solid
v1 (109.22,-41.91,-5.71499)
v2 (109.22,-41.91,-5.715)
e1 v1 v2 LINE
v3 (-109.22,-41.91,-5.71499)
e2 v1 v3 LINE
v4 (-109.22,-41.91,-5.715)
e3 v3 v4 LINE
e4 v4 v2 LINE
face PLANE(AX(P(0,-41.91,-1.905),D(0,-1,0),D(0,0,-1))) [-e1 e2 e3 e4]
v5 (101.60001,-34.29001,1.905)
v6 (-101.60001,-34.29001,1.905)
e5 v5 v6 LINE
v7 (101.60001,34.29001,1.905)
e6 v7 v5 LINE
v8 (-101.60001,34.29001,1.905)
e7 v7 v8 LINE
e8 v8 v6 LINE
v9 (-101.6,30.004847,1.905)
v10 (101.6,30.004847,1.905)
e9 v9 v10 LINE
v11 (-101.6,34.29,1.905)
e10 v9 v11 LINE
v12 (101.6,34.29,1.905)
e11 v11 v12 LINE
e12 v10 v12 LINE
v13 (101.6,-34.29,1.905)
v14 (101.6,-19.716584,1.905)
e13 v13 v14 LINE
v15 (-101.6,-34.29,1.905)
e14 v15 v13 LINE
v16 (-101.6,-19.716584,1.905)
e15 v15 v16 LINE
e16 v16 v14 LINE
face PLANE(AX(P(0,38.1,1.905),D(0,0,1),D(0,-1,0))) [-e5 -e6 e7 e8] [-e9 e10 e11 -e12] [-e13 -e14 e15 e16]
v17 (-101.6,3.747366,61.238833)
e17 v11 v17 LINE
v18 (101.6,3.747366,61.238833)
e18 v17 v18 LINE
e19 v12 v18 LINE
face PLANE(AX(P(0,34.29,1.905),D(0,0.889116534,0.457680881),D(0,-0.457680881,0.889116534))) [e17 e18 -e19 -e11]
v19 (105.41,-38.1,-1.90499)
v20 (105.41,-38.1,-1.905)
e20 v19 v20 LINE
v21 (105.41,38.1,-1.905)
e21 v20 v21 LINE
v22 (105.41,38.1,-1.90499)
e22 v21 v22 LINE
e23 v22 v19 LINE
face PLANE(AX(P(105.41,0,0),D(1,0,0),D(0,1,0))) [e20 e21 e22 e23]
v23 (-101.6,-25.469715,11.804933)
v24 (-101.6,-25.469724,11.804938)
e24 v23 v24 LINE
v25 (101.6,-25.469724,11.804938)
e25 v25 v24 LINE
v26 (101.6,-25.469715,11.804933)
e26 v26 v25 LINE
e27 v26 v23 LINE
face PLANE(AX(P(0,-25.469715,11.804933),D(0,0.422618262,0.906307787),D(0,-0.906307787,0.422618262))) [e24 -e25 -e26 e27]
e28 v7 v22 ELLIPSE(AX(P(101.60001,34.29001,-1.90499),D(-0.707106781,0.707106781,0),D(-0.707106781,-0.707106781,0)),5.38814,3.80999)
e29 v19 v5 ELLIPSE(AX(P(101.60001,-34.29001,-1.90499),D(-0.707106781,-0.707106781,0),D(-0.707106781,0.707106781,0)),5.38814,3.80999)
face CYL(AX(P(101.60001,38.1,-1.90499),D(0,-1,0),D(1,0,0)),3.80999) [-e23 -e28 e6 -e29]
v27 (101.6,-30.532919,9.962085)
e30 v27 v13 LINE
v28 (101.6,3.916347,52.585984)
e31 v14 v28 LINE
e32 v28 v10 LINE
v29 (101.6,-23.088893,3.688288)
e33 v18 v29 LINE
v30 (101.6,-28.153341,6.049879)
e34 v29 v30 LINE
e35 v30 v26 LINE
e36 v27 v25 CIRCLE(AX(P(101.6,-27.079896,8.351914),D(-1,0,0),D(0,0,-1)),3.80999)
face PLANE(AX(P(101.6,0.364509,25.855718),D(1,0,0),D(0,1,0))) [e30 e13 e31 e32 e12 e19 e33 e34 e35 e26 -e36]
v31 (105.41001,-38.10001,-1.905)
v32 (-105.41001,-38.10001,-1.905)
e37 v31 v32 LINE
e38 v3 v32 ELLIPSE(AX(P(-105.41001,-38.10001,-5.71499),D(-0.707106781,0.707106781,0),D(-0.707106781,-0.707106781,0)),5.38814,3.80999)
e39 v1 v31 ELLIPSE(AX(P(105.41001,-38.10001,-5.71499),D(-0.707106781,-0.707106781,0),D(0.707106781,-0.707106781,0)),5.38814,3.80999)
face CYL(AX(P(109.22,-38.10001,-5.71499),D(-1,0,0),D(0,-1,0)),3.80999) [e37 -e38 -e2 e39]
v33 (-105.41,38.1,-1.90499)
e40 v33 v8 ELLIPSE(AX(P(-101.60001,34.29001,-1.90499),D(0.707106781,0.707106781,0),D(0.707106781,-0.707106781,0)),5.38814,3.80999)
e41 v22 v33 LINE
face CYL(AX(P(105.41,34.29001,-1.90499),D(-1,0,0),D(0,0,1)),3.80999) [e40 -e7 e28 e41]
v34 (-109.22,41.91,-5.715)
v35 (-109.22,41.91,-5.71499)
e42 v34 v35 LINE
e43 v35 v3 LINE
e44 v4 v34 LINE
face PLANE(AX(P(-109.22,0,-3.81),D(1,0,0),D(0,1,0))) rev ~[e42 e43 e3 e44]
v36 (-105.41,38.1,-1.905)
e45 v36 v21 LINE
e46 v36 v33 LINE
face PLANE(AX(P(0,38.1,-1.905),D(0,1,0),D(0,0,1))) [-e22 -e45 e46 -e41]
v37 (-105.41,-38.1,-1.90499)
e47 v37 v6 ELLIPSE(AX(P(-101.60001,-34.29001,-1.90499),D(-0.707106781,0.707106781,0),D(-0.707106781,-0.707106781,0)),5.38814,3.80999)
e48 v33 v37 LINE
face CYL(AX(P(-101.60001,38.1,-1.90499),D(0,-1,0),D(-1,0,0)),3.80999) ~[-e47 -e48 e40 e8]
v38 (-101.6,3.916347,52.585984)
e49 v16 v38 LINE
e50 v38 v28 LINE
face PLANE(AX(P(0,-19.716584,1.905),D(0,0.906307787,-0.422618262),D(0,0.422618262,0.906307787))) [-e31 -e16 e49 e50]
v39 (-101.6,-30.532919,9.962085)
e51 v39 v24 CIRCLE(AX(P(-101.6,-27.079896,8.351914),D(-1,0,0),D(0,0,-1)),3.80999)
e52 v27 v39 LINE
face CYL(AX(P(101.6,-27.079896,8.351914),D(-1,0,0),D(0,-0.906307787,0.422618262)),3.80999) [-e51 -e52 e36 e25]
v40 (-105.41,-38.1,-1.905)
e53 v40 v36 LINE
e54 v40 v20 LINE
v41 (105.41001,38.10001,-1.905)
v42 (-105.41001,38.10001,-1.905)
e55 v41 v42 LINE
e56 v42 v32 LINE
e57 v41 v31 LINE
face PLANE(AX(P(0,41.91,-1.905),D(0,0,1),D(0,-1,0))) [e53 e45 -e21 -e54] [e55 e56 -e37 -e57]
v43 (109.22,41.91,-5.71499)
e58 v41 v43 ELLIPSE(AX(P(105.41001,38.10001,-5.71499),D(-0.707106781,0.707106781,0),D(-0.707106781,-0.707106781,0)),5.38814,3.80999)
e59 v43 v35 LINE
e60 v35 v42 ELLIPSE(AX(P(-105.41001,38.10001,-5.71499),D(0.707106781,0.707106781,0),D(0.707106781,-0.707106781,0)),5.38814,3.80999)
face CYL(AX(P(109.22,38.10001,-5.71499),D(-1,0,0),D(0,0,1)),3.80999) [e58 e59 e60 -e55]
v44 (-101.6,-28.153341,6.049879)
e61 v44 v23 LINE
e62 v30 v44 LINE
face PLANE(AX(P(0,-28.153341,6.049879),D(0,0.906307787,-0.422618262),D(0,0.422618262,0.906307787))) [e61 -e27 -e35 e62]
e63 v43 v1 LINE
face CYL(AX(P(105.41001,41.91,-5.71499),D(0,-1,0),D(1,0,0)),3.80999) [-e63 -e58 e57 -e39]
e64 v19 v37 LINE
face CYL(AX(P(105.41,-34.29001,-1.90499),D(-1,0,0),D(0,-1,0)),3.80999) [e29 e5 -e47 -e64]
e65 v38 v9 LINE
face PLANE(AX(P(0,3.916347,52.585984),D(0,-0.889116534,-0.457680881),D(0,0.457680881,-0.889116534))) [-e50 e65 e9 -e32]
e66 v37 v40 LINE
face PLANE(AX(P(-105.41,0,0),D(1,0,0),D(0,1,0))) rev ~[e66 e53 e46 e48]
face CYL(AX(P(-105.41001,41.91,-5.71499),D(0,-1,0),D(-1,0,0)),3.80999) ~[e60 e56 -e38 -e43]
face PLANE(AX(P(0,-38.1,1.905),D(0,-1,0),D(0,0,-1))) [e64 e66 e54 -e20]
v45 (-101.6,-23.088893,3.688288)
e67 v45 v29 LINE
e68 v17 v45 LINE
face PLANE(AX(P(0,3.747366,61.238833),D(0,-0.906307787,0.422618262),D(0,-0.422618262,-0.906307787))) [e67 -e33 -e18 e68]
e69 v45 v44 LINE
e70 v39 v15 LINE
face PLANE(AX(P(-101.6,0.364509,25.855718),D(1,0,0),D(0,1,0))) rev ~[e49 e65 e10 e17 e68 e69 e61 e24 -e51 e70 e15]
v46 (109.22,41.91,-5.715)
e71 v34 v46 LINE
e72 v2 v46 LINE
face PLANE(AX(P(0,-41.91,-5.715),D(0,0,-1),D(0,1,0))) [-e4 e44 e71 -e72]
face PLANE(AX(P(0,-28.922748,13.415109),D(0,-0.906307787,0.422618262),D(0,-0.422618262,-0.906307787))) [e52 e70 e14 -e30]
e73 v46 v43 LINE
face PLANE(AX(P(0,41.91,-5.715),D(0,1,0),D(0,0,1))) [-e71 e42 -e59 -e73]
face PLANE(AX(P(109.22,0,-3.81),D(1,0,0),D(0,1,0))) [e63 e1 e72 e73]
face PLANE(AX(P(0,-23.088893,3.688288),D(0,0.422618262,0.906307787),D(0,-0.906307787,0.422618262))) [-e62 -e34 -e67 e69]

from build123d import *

# Parameters (mm, degrees)
F1_DEPTH = 101.6
F2_DEPTH = 105.41
F3_R     = 3.80999
F4_R     = 3.80999
F5_DEPTH = 109.22
F6_R     = 3.80999


# Not quite as in the source:
# - a fillet or chamfer is up to 0.001 mm smaller than in the source, because OpenCascade refuses the exact size


with BuildPart() as f1:
    # F0 (on Right) → F1 (new body, symmetric)
    with BuildSketch(Plane.YZ):
        Polygon((-28.9227480759, 13.4151088954), (-34.29, 1.905), (-19.7165844463, 1.905), (3.9163465702, 52.5859841168), (30.004847431, 1.905), (34.29, 1.905), (3.7473661652, 61.2388325007), (-23.0888934554, 3.6882880238), (-28.1533413693, 6.0498788705), (-25.4697154073, 11.8049333181), align=None)
    extrude(amount=F1_DEPTH, both=True)

    # F0 (on Right) → F2 (join, symmetric)
    with BuildSketch(Plane.YZ):
        Polygon((-38.1, 1.905), (-38.1, -1.905), (38.1, -1.905), (38.1, 1.905), (34.29, 1.905), (30.004847431, 1.905), (-19.7165844463, 1.905), (-34.29, 1.905), align=None)
    extrude(amount=F2_DEPTH, both=True)

    # F3 (radius 3.81 in the source; OpenCascade refuses exactly that, so slightly less here)
    f3_edges = [f1.edges().sort_by_distance(p)[0] for p in [
        (-105.41, 0, 1.905),
        (0, -38.1, 1.905),
        (0, 38.1, 1.905),
        (105.41, 0, 1.905),
    ]]
    fillet(f3_edges, radius=F3_R)

    # F4 (radius 3.81 in the source; OpenCascade refuses exactly that, so slightly less here)
    f4_edges = [f1.edges().sort_by_distance(p)[0] for p in [
        (0, -28.922748, 13.415109),
    ]]
    fillet(f4_edges, radius=F4_R)

    # F0 (on Right) → F5 (join, symmetric)
    with BuildSketch(Plane.YZ):
        Polygon((38.1, -1.905), (-38.1, -1.905), (-41.91, -1.905), (-41.91, -5.715), (41.91, -5.715), (41.91, -1.905), align=None)
    extrude(amount=F5_DEPTH, both=True)

    # F6 (radius 3.81 in the source; OpenCascade refuses exactly that, so slightly less here)
    f6_edges = [f1.edges().sort_by_distance(p)[0] for p in [
        (-109.22, 0, -1.905),
        (0, 41.91, -1.905),
        (109.22, 0, -1.905),
        (0, -41.91, -1.905),
    ]]
    fillet(f6_edges, radius=F6_R)


solid = f1.part
